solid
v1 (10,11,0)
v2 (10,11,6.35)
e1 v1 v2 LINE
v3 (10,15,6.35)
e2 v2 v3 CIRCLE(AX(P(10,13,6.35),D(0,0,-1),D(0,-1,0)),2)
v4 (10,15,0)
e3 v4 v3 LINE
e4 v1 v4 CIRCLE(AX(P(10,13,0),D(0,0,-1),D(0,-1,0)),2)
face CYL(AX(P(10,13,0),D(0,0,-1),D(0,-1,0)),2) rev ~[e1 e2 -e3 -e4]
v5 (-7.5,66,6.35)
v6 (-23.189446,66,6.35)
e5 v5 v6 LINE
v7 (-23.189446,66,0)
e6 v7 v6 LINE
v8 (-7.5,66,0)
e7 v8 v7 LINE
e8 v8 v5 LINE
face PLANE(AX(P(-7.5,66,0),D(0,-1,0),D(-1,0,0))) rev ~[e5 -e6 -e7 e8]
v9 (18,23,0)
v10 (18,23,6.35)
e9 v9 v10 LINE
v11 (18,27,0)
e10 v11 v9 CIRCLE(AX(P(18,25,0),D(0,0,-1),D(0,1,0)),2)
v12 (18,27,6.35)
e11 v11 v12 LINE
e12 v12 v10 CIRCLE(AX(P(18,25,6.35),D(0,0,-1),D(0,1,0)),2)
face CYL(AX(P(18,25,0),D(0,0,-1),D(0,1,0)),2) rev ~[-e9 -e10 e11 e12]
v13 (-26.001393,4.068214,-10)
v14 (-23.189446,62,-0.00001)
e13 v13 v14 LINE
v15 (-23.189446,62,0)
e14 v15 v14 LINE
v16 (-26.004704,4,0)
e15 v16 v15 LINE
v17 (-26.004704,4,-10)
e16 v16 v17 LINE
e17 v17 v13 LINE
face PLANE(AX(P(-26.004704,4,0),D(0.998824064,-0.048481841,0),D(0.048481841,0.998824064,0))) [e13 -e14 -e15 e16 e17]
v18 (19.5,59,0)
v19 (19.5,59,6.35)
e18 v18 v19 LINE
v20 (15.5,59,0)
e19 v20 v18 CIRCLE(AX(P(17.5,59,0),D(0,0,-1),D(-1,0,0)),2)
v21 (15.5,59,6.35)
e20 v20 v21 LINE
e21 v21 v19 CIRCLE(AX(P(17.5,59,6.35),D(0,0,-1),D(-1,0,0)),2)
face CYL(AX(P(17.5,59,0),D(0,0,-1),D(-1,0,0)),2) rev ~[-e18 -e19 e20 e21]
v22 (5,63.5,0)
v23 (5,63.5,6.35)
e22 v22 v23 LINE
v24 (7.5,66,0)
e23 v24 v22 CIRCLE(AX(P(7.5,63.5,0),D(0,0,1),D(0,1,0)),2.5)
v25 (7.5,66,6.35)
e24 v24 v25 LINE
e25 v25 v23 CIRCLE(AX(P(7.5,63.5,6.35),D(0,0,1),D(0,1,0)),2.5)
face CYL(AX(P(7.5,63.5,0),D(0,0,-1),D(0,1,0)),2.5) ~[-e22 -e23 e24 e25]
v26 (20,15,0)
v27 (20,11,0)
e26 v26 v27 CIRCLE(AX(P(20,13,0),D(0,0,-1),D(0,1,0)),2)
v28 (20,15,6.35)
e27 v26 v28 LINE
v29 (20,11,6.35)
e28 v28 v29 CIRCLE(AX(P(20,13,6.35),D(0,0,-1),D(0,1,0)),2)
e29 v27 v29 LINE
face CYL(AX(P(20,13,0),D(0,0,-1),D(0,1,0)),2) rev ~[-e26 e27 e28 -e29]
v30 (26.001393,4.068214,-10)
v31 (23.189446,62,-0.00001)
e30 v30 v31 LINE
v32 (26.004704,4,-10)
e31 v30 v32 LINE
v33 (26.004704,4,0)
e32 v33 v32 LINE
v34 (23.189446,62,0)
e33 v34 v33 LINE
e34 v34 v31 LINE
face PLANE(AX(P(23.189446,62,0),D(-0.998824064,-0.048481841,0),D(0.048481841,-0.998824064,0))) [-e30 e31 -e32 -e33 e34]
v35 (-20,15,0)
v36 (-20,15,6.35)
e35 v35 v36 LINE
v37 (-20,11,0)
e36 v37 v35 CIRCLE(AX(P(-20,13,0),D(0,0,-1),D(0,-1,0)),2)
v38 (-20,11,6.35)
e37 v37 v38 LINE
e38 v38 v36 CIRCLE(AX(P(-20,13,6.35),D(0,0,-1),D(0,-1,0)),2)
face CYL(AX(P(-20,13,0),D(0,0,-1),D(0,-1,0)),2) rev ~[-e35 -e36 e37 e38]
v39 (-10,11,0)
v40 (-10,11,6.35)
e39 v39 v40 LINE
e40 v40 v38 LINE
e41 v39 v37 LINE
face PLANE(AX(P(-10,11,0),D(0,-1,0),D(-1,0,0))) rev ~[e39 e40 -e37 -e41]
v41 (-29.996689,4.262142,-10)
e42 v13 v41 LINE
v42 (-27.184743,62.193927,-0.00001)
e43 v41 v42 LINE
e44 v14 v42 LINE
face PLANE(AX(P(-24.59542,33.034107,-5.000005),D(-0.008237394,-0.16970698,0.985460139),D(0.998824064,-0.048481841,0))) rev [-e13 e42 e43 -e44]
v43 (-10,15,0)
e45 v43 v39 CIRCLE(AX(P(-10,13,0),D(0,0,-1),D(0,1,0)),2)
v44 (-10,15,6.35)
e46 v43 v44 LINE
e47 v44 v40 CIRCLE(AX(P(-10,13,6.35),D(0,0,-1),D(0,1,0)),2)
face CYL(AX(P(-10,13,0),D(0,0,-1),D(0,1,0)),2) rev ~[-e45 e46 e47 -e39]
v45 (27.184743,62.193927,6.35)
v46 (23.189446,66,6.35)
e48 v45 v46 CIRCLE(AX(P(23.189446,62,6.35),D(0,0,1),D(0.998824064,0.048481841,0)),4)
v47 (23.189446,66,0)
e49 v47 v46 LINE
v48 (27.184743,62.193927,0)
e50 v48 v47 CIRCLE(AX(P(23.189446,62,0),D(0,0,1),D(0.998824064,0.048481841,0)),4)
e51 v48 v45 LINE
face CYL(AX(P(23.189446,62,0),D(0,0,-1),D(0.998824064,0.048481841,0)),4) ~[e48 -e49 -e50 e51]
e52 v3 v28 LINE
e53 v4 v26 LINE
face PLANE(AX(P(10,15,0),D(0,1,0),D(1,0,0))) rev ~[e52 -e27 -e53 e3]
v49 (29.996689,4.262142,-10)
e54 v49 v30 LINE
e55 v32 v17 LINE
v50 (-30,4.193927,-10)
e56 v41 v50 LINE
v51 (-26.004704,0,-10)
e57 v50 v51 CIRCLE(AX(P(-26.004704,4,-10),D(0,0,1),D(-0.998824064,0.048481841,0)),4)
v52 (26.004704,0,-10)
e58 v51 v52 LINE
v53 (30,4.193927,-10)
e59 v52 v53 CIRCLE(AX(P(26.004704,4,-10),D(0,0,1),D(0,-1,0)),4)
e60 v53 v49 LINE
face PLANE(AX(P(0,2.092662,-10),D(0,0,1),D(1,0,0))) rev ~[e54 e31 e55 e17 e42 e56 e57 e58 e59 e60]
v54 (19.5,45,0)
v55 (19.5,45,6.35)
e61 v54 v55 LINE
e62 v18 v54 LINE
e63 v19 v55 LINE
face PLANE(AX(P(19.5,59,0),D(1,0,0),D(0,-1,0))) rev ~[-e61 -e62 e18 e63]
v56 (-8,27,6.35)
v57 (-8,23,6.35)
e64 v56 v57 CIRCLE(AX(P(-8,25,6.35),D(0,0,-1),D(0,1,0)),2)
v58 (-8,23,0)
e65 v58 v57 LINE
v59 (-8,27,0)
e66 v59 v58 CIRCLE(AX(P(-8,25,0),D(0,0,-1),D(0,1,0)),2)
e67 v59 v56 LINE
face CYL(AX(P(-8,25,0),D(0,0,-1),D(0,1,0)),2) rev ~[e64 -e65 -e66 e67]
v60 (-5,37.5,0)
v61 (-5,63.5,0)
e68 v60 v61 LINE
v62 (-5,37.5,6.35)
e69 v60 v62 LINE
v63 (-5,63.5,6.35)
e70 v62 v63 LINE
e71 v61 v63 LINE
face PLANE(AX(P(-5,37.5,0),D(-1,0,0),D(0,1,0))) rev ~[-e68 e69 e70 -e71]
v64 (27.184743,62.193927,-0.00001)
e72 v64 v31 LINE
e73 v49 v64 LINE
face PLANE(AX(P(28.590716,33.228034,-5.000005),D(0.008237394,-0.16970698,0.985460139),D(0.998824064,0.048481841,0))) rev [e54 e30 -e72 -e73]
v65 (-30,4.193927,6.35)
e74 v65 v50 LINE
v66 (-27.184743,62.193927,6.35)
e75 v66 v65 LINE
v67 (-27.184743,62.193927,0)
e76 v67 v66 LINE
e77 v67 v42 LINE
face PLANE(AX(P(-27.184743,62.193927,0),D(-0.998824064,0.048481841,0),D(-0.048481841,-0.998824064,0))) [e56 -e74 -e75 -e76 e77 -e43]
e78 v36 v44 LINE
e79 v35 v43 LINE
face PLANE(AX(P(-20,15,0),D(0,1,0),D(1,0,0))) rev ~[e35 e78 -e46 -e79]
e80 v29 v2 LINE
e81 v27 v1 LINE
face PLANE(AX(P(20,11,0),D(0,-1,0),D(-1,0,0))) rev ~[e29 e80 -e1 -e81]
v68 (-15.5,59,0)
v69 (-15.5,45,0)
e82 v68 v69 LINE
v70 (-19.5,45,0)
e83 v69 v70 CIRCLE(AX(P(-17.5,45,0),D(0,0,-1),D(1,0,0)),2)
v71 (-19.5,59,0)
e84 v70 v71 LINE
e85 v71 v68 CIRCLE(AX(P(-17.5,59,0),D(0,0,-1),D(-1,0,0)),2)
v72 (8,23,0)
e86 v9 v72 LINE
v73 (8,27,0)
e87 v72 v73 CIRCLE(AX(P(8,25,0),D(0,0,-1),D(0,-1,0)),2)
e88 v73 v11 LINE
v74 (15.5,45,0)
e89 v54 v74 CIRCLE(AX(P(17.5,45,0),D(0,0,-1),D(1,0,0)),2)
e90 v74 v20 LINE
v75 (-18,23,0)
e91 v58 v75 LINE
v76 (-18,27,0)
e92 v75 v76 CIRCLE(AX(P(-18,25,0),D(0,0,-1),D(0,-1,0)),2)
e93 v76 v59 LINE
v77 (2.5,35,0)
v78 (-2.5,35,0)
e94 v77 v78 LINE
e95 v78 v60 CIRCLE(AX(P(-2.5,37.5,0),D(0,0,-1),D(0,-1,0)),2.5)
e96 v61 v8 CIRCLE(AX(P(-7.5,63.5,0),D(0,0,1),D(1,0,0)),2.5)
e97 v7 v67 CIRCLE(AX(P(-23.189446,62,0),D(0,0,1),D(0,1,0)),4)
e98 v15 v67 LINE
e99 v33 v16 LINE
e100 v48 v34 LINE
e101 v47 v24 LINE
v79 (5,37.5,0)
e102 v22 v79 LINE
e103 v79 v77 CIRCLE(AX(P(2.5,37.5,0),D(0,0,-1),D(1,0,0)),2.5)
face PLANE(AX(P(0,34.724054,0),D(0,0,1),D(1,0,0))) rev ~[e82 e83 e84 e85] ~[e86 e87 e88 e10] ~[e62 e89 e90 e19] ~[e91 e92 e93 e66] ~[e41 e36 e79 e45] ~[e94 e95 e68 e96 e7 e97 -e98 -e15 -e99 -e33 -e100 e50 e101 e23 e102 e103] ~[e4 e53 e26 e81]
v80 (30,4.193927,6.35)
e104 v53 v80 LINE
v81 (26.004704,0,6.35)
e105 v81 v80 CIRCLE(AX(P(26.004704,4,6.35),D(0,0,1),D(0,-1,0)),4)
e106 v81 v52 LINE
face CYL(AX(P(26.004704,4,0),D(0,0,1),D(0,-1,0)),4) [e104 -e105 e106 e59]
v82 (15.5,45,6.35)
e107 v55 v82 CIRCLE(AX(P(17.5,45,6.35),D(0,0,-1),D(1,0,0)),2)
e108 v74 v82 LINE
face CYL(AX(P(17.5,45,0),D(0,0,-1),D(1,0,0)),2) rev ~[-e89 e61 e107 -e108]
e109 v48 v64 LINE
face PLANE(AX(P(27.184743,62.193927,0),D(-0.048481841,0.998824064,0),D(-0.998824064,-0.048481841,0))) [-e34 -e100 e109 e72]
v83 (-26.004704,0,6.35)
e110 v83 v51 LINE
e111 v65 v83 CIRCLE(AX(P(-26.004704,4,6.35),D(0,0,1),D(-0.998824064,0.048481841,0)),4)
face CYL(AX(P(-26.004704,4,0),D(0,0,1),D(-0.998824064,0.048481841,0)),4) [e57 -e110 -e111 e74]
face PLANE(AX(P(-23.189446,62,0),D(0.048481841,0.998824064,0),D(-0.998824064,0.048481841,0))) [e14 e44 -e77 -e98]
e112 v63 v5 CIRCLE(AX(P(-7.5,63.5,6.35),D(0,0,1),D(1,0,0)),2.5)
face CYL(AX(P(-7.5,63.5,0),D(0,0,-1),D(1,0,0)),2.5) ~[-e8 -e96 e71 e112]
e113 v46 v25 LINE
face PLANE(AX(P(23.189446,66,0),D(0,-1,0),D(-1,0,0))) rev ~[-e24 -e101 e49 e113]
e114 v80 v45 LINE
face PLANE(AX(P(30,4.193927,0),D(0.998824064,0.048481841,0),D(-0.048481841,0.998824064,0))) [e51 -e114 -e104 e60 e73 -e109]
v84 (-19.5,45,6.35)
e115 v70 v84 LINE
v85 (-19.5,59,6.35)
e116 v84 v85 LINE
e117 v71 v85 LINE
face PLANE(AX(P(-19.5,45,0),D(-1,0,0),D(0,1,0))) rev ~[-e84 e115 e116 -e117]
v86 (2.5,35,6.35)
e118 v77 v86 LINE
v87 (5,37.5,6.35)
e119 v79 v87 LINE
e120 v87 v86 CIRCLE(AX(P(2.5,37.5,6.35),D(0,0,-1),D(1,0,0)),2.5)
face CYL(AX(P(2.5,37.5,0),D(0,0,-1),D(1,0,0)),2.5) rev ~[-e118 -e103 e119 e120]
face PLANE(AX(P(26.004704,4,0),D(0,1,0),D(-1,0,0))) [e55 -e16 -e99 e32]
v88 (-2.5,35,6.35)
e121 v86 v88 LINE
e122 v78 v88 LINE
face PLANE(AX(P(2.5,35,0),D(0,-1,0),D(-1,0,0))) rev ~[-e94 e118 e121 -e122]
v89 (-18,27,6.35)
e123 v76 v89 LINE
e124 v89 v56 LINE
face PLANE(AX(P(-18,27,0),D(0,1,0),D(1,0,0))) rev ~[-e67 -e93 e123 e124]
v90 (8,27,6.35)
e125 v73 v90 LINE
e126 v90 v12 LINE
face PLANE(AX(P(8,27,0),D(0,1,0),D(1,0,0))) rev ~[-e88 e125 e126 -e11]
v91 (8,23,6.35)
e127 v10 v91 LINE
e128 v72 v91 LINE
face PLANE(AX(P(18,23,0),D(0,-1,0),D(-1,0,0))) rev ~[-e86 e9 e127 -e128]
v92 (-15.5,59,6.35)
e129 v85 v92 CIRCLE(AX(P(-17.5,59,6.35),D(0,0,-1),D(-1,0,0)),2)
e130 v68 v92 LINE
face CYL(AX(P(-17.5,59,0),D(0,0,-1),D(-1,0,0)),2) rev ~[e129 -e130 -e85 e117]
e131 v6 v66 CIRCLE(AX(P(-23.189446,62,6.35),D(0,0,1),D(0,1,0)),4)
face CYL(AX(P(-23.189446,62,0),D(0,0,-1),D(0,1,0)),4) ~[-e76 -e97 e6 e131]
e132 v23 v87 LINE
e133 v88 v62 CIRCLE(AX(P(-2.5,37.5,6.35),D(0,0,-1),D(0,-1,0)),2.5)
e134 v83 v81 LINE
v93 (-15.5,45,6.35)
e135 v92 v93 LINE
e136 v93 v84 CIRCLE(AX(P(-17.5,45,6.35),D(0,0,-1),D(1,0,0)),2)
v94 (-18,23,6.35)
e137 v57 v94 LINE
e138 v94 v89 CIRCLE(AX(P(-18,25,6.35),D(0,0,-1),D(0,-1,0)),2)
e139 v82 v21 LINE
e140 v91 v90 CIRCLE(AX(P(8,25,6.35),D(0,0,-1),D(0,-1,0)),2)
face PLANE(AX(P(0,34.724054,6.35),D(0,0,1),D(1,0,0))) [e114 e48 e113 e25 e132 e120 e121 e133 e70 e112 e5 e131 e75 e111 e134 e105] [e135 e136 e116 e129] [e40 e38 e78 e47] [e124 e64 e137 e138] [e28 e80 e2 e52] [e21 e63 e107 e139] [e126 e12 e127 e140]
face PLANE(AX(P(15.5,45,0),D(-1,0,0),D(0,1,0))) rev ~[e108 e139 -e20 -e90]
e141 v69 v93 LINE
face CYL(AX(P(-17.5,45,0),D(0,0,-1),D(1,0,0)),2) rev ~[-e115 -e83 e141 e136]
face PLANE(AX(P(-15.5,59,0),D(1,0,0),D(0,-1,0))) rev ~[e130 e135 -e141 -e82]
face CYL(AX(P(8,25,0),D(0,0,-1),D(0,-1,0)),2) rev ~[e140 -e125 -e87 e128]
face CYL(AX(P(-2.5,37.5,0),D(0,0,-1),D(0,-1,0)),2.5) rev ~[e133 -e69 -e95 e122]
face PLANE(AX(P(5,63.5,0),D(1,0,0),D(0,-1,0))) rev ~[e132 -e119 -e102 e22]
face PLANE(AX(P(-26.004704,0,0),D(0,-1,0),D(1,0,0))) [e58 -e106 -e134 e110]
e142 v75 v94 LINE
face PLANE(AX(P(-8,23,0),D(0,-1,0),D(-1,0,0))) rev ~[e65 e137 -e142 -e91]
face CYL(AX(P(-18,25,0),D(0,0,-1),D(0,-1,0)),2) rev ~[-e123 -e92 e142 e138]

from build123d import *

# Parameters (mm, degrees)
F1_DEPTH = 6.35
F3_DEPTH = 10
F4_SIZE2 = 9.99999
F4_SIZE  = 57.99999
F5_SIZE2 = 9.99999
F5_SIZE  = 57.99999


# Not quite as in the source:
# - a fillet or chamfer is up to 0.001 mm smaller than in the source, because OpenCascade refuses the exact size


with BuildPart() as f1:
    # F0 (on Top) → F1 (new body)
    with BuildSketch(Plane.XY):
        with BuildLine():
            Line((-26.0047037435, 0), (0, 0))
            Line((0, 0), (26.0047037435, 0))
            ThreePointArc((26.0047037435, 0), (28.9008830765, 1.2409883525), (30, 4.1939273644))
            Line((30, 4.1939273644), (27.1847426542, 62.1939273644))
            ThreePointArc((27.1847426542, 62.1939273644), (25.9484580453, 64.896179333), (23.1894463977, 66))
            Line((23.1894463977, 66), (7.5, 66))
            ThreePointArc((7.5, 66), (5.732233047, 65.267766953), (5, 63.5))
            Line((5, 63.5), (5, 37.5))
            ThreePointArc((5, 37.5), (4.267766953, 35.732233047), (2.5, 35))
            Line((2.5, 35), (0, 35))
            Line((0, 35), (-2.5, 35))
            ThreePointArc((-2.5, 35), (-4.267766953, 35.732233047), (-5, 37.5))
            Line((-5, 37.5), (-5, 63.5))
            ThreePointArc((-5, 63.5), (-5.732233047, 65.267766953), (-7.5, 66))
            Line((-7.5, 66), (-23.1894463977, 66))
            ThreePointArc((-23.1894463977, 66), (-25.9484580453, 64.896179333), (-27.1847426542, 62.1939273644))
            Line((-27.1847426542, 62.1939273644), (-30, 4.1939273644))
            ThreePointArc((-30, 4.1939273644), (-28.9008830765, 1.2409883525), (-26.0047037435, 0))
        make_face()
        with BuildLine():
            ThreePointArc((-20, 11), (-22, 13), (-20, 15))
            Line((-20, 15), (-10, 15))
            ThreePointArc((-10, 15), (-8, 13), (-10, 11))
            Line((-10, 11), (-20, 11))
        make_face(mode=Mode.SUBTRACT)
        with BuildLine():
            Line((-18, 27), (-8, 27))
            ThreePointArc((-8, 27), (-6, 25), (-8, 23))
            Line((-8, 23), (-18, 23))
            ThreePointArc((-18, 23), (-20, 25), (-18, 27))
        make_face(mode=Mode.SUBTRACT)
        with BuildLine():
            Line((10, 15), (20, 15))
            ThreePointArc((20, 15), (22, 13), (20, 11))
            Line((20, 11), (10, 11))
            ThreePointArc((10, 11), (8, 13), (10, 15))
        make_face(mode=Mode.SUBTRACT)
        with BuildLine():
            Line((18, 23), (8, 23))
            ThreePointArc((8, 23), (6, 25), (8, 27))
            Line((8, 27), (18, 27))
            ThreePointArc((18, 27), (20, 25), (18, 23))
        make_face(mode=Mode.SUBTRACT)
        with BuildLine():
            ThreePointArc((-15.5, 45), (-17.5, 43), (-19.5, 45))
            Line((-19.5, 45), (-19.5, 59))
            ThreePointArc((-19.5, 59), (-17.5, 61), (-15.5, 59))
            Line((-15.5, 59), (-15.5, 45))
        make_face(mode=Mode.SUBTRACT)
        with BuildLine():
            Line((15.5, 45), (15.5, 59))
            ThreePointArc((15.5, 59), (17.5, 61), (19.5, 59))
            Line((19.5, 59), (19.5, 45))
            ThreePointArc((19.5, 45), (17.5, 43), (15.5, 45))
        make_face(mode=Mode.SUBTRACT)
    extrude(amount=F1_DEPTH)

    # F2 (on face) → F3 (join)
    with BuildSketch(Plane.XY):
        with BuildLine():
            ThreePointArc((26.0047037435, 0), (28.9008830765, 1.2409883525), (30, 4.1939273644))
            Line((30, 4.1939273644), (26.0047037435, 4))
            Line((26.0047037435, 4), (-26.0047037435, 4))
            Line((-26.0047037435, 4), (-30, 4.1939273644))
            ThreePointArc((-30, 4.1939273644), (-28.9008830765, 1.2409883525), (-26.0047037435, 0))
            Line((-26.0047037435, 0), (0, 0))
            Line((0, 0), (26.0047037435, 0))
        make_face()
        Polygon((-30, 4.1939273644), (-26.0047037435, 4), (-23.1894463977, 62), (-27.1847426542, 62.1939273644), align=None)
        Polygon((26.0047037435, 4), (30, 4.1939273644), (27.1847426542, 62.1939273644), (23.1894463977, 62), align=None)
    extrude(amount=-F3_DEPTH)

    # F4 (size 58 and 10 in the source; OpenCascade refuses exactly that, so slightly less here)
    f4_edges = [f1.edges().sort_by_distance(p)[0] for p in [
        (-25.187095, 62.096964, -10),
    ]]
    f4_side = f1.faces().sort_by_distance((0, 0.864246, -10))[0]
    chamfer(f4_edges, length=F4_SIZE, length2=F4_SIZE2, reference=f4_side)

    # F5 (size 58 and 10 in the source; OpenCascade refuses exactly that, so slightly less here)
    f5_edges = [f1.edges().sort_by_distance(p)[0] for p in [
        (25.187095, 62.096964, -10),
    ]]
    f5_side = f1.faces().sort_by_distance((-25.139818, 3.992207, -10))[0]
    chamfer(f5_edges, length=F5_SIZE, length2=F5_SIZE2, reference=f5_side)


solid = f1.part
